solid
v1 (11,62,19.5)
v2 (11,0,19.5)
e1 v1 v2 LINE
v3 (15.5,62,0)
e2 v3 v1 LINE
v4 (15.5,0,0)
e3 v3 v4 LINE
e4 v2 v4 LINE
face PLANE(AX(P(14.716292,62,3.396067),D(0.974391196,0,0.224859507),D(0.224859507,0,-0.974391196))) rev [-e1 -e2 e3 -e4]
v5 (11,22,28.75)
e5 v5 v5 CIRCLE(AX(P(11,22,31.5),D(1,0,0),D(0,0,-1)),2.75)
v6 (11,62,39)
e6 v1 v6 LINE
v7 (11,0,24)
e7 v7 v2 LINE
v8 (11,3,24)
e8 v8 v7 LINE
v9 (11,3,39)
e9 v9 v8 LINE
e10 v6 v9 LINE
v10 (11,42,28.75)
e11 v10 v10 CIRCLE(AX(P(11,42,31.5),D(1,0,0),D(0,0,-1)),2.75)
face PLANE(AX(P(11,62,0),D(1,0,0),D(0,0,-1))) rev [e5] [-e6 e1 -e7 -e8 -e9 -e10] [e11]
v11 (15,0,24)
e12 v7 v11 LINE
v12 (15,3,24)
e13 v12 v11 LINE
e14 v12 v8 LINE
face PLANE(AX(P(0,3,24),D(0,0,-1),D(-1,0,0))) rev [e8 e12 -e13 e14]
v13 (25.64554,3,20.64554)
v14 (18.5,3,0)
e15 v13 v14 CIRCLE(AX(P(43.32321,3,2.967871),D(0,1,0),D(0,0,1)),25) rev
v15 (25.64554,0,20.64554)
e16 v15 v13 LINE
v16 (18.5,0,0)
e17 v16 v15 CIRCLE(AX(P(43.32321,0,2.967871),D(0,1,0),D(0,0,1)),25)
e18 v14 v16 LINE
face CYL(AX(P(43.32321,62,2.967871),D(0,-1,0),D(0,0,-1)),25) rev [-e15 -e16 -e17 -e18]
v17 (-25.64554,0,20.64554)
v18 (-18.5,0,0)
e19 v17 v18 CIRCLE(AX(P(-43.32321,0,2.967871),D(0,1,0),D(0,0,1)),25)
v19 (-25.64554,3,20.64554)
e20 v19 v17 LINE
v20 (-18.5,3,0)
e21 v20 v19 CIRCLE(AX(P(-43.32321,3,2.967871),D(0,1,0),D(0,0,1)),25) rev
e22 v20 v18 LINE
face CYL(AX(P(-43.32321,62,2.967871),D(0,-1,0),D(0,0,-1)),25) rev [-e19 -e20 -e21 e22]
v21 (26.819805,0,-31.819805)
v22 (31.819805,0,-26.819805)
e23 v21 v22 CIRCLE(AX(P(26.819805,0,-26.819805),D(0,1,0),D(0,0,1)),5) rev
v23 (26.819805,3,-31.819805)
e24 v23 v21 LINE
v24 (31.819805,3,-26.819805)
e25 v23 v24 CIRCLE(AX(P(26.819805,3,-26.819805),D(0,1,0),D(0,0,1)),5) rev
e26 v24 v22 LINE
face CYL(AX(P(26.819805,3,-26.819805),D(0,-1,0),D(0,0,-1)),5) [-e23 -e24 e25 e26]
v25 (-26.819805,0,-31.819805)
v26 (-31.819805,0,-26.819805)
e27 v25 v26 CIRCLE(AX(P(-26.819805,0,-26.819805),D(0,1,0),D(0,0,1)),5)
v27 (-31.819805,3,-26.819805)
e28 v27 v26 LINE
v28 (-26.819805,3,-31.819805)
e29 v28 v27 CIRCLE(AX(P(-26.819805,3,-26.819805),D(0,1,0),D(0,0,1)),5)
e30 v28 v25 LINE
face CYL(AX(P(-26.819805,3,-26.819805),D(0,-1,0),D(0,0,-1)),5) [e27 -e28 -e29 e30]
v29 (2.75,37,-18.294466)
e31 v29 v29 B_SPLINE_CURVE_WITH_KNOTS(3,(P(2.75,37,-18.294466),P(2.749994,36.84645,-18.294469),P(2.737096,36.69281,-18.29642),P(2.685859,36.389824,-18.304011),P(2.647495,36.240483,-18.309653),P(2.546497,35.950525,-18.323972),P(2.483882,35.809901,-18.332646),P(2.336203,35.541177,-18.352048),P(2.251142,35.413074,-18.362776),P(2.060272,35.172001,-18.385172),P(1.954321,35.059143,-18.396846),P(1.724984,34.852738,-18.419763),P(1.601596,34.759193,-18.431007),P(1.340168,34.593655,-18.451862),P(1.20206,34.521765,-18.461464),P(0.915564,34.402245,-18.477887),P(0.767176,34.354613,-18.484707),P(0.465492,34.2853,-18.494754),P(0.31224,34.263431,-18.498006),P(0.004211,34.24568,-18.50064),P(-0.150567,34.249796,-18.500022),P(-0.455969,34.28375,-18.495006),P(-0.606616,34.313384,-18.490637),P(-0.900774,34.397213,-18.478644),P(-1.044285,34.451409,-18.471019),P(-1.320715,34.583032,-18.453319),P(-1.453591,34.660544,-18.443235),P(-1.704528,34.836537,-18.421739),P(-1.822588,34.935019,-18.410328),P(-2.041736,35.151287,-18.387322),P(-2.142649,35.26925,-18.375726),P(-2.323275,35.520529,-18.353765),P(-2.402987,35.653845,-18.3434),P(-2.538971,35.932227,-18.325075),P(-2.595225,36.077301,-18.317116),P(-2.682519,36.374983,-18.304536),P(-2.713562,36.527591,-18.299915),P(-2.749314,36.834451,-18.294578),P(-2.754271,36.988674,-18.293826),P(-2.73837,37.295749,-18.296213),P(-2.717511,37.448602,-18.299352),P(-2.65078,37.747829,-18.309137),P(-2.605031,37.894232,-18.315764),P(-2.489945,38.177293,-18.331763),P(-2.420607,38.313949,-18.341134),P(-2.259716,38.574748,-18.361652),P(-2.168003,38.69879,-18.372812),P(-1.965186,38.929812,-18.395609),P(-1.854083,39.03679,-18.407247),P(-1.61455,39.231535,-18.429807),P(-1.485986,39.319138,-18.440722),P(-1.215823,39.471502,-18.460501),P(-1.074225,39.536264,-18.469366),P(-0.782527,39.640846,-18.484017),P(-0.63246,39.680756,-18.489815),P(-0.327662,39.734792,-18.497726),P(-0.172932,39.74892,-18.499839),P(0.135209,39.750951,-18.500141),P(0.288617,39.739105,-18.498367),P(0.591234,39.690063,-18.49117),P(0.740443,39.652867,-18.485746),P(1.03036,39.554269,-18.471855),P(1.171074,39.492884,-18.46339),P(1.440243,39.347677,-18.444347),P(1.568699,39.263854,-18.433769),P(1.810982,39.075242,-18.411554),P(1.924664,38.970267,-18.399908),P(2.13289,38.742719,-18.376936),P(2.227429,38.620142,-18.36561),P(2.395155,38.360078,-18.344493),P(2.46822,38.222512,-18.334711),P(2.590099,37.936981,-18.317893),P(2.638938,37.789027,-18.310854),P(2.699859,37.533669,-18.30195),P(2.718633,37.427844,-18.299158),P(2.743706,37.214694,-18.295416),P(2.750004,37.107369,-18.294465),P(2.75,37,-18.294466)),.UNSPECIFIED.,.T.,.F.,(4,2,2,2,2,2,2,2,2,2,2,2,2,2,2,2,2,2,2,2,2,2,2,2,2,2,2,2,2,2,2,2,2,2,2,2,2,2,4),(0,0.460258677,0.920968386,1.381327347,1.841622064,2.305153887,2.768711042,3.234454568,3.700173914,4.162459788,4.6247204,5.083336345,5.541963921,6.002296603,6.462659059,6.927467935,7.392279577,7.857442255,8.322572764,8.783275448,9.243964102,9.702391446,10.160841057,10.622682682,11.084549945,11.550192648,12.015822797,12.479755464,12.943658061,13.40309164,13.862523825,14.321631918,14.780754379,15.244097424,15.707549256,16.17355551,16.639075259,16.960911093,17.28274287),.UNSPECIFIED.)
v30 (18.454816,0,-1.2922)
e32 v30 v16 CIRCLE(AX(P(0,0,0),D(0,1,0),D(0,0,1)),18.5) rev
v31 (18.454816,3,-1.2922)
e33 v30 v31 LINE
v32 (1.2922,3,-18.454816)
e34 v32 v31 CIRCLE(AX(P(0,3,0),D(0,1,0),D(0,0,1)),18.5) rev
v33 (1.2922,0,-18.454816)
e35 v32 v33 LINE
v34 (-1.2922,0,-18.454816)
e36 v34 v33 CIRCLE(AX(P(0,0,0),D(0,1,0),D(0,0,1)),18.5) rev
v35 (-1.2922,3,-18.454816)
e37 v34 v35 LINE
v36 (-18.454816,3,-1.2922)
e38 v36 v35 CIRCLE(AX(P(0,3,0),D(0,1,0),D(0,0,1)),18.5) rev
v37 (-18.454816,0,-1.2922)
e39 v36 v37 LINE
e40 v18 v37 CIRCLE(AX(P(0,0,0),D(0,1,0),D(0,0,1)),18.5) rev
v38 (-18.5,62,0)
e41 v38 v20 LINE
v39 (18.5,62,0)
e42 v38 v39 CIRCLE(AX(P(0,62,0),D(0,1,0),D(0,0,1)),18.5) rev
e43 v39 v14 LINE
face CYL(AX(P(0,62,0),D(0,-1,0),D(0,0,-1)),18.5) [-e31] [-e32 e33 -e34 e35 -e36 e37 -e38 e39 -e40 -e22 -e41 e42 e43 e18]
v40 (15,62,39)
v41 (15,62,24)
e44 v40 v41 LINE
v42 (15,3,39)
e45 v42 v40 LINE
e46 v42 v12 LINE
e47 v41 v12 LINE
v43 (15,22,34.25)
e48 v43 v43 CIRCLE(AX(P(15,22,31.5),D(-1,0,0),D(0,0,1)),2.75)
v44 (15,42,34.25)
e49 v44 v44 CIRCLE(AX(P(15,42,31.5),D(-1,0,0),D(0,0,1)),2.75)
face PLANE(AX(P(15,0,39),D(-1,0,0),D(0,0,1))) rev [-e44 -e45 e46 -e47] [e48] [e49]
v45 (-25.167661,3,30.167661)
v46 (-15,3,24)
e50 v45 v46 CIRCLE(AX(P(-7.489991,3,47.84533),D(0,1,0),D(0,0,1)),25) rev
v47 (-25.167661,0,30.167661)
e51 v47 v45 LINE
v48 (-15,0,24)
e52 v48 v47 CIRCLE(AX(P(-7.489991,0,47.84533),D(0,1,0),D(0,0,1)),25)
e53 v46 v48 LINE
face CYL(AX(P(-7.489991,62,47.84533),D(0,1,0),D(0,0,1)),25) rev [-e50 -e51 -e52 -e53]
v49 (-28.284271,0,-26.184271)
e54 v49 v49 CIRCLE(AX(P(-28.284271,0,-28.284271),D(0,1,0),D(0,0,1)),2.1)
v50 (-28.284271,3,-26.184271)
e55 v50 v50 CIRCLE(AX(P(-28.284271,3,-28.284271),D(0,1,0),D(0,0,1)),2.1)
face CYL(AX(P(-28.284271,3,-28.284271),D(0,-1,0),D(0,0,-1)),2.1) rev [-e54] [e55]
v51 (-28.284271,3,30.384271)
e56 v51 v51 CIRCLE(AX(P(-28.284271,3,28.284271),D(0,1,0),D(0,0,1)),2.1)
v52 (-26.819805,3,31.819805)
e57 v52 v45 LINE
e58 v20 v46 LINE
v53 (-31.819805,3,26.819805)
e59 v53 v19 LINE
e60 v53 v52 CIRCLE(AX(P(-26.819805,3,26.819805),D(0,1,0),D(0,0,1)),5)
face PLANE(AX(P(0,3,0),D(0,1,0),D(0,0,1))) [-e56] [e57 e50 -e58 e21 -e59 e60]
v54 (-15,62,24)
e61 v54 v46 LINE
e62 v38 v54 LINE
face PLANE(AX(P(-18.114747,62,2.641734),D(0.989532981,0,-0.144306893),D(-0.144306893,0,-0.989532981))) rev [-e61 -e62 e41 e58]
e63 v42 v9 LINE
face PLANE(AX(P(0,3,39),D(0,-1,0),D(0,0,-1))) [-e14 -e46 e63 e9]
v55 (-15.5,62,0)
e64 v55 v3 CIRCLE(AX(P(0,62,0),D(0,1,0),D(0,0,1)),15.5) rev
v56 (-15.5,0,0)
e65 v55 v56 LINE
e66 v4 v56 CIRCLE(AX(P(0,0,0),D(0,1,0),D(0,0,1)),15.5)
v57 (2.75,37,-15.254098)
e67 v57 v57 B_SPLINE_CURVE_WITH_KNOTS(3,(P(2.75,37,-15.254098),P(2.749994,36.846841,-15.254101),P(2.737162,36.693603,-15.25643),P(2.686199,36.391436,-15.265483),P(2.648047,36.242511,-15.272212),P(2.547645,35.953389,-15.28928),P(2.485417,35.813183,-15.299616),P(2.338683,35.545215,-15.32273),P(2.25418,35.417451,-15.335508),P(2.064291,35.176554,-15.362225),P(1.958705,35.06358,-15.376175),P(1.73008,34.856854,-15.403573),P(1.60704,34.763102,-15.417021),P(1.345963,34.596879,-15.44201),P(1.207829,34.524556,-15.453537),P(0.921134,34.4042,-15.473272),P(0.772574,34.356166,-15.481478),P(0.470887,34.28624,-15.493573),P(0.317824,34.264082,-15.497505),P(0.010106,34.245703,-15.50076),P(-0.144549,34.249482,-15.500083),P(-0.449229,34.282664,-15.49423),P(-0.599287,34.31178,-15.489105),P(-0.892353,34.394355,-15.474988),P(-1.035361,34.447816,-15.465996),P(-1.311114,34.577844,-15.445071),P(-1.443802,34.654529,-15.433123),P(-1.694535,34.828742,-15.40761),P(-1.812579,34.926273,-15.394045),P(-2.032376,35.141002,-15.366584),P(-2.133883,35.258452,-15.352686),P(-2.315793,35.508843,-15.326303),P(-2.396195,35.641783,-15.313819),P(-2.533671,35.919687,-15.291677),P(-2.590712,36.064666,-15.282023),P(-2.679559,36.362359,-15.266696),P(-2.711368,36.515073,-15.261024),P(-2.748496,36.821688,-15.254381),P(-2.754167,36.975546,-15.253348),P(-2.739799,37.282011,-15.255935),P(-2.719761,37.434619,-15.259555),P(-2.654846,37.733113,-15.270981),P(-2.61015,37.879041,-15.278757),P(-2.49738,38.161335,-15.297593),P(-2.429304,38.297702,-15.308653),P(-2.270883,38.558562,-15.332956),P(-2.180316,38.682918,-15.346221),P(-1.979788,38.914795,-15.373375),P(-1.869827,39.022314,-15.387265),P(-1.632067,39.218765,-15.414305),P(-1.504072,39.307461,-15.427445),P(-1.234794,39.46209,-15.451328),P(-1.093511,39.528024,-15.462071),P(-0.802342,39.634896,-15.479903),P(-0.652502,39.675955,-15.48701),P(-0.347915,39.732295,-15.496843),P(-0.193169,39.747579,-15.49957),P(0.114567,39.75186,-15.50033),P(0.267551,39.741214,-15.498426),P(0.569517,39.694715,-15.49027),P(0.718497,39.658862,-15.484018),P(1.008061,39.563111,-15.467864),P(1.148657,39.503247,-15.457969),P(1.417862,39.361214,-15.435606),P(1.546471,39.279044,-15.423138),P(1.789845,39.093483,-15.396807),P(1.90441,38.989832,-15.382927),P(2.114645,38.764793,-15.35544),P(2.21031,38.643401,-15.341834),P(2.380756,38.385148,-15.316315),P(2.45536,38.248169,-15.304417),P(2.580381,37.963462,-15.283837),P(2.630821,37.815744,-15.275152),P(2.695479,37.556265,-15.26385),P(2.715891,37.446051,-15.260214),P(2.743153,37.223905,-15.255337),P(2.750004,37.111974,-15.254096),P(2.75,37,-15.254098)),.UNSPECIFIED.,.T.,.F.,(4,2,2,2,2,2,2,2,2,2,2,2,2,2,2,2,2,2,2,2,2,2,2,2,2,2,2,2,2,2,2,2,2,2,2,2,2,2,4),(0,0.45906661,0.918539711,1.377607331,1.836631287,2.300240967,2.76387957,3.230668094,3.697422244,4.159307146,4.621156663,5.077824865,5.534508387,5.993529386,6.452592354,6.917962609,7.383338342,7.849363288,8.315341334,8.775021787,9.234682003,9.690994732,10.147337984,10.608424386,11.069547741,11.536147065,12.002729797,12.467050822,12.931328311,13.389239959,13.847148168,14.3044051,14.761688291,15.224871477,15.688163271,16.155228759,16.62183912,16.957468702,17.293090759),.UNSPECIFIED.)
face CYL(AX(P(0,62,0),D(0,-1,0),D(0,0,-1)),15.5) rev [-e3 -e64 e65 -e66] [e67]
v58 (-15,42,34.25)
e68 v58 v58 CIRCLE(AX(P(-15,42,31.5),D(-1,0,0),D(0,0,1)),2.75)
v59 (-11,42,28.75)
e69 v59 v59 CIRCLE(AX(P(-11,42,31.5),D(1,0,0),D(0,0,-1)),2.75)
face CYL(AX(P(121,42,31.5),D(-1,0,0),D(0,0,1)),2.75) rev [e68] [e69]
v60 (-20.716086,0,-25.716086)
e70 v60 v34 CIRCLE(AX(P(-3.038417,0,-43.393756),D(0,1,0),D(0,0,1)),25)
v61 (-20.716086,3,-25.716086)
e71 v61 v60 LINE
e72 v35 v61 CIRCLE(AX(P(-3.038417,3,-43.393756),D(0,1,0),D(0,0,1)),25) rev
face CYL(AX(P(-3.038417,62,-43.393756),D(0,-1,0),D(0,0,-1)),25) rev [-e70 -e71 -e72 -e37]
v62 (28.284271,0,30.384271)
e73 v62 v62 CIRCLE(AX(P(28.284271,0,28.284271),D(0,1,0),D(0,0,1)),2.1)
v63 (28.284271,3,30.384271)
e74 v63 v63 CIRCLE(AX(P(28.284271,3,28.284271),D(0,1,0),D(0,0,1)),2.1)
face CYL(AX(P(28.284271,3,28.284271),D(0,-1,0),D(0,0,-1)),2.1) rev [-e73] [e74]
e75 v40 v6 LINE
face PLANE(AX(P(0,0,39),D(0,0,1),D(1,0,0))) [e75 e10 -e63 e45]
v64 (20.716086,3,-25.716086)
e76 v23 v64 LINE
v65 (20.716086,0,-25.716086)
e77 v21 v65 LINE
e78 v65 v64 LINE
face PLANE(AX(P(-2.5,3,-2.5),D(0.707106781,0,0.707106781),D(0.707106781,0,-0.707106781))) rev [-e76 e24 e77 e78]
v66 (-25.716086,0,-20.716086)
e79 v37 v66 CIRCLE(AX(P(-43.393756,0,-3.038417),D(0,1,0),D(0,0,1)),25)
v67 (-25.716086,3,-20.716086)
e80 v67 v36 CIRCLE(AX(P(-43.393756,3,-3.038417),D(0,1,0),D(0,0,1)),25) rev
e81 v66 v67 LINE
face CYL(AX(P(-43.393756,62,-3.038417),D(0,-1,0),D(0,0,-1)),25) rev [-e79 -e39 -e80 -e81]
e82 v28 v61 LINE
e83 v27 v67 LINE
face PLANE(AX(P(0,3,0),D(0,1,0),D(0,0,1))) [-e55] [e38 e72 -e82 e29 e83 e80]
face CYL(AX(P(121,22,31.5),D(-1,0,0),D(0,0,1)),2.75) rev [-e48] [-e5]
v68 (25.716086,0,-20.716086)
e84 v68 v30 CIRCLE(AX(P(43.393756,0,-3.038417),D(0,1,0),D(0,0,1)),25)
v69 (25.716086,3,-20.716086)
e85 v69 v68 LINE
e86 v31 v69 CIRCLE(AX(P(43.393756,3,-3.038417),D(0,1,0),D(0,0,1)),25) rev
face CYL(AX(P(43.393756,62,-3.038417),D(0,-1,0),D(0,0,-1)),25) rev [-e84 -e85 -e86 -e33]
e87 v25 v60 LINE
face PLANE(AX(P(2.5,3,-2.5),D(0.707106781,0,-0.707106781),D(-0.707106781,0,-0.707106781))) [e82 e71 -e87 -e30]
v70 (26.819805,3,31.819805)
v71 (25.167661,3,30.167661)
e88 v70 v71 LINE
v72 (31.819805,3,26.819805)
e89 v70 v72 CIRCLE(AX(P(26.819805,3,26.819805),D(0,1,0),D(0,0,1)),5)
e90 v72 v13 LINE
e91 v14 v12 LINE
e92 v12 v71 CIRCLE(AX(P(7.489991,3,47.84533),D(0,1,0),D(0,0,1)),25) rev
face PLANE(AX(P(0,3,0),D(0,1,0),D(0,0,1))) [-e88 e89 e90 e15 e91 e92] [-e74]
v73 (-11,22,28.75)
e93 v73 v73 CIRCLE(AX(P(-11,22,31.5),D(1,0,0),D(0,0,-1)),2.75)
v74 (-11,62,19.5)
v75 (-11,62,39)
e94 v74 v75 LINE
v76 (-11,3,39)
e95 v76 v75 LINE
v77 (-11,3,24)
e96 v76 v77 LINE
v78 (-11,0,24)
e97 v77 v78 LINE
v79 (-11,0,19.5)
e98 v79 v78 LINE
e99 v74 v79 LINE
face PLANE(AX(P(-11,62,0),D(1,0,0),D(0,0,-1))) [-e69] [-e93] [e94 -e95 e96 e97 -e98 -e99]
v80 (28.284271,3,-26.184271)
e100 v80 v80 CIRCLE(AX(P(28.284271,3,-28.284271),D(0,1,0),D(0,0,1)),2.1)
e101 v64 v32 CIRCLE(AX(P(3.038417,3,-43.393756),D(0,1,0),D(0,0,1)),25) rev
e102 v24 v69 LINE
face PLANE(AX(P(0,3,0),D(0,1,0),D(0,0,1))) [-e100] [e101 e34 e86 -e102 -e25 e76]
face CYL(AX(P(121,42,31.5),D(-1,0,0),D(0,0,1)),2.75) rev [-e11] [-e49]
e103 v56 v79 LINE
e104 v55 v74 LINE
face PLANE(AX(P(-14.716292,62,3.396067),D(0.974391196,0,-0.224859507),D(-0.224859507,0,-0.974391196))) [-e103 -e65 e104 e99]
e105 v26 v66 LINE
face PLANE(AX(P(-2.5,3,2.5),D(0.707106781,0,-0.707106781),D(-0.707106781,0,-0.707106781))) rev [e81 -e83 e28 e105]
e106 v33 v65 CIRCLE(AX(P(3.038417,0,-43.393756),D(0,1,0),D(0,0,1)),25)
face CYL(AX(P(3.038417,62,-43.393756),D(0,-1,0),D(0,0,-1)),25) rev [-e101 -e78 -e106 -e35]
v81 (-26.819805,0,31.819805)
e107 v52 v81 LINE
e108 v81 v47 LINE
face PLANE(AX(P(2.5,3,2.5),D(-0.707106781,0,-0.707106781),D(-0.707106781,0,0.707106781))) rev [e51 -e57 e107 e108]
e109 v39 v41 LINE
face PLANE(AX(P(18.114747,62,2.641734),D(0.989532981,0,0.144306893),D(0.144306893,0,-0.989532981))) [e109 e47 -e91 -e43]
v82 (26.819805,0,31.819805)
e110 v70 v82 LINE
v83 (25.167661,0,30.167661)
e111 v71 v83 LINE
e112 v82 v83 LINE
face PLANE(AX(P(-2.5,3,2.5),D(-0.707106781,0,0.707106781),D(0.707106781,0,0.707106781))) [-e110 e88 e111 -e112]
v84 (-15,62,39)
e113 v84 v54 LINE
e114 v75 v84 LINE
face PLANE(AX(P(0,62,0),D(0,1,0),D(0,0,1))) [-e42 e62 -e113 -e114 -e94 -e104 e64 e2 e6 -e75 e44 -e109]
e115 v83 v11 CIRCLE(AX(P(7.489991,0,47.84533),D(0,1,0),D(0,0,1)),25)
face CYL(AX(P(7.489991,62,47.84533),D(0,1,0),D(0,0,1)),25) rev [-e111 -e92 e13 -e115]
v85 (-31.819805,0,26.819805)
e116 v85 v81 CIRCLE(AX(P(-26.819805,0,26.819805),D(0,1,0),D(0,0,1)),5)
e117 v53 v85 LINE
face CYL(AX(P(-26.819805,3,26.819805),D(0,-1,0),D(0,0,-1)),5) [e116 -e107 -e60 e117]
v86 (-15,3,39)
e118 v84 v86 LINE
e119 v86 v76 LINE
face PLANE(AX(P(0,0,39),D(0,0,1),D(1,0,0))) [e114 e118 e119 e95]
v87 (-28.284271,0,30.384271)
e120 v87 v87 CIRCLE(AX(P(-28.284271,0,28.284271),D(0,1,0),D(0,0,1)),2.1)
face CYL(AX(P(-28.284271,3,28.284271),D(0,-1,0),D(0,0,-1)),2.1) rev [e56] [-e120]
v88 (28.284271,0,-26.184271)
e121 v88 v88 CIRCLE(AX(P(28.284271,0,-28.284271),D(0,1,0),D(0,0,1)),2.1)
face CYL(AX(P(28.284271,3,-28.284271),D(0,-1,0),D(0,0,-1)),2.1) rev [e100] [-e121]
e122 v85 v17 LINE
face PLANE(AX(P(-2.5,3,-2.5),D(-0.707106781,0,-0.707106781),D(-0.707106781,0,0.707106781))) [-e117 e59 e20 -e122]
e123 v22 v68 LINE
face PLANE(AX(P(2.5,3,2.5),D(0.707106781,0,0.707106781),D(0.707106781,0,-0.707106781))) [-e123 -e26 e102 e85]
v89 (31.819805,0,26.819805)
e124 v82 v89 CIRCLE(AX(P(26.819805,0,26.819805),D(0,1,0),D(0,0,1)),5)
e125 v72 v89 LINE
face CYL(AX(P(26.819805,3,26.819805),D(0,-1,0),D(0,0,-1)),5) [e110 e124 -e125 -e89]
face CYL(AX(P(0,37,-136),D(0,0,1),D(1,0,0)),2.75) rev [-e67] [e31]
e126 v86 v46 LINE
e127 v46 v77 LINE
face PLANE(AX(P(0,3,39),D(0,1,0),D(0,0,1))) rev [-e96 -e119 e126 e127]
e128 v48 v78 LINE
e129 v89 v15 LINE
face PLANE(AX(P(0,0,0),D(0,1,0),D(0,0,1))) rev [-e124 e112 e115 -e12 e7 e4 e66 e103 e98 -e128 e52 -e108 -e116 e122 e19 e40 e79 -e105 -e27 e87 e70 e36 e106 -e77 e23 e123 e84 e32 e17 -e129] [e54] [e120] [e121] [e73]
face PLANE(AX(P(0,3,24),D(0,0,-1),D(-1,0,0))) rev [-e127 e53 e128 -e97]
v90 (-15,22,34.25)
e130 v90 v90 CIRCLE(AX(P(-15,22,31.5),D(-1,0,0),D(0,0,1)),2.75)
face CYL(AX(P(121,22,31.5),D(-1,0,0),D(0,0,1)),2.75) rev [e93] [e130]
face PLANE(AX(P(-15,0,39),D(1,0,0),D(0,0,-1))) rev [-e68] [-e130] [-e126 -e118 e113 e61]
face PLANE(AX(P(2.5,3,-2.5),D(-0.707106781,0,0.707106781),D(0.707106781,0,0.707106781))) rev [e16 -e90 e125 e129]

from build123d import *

# Parameters (mm, degrees)
SKETCH_1_R          = 2.1
EXTRUDE_1_DEPTH     = 3
EXTRUDE_2_DEPTH     = 59
CUT_EXTRUDE_START   = -59
CUT_EXTRUDE_1_DEPTH = 59
CUT_EXTRUDE_2_DEPTH = 59
FILLET_3_DEPTH      = 3
SKETCH_7_W          = 4
SKETCH_7_H          = 59
EXTRUDE_3_DEPTH     = 15
SKETCH_8_R          = 2.75
CUT_EXTRUDE_3_DEPTH = 136
SKETCH_9_R          = 2.75
CUT_EXTRUDE_4_DEPTH = 136


with BuildPart() as part:
    # 草图1 → 凸台-拉伸1 (new body)
    with BuildSketch(Plane(origin=(0, 0, 0), x_dir=(1, 0, 0), z_dir=(0, 1, 0))):
        with BuildLine():
            ThreePointArc((-26.819805153, 31.819805153), (-30.355339059, 30.355339059), (-31.819805153, 26.819805153))
            Line((-31.819805153, 26.819805153), (-24, 19))
            Line((-24, 19), (-24, -19))
            Line((-24, -19), (-31.819805153, -26.819805153))
            ThreePointArc((-31.819805153, -26.819805153), (-30.355339059, -30.355339059), (-26.819805153, -31.819805153))
            Line((-26.819805153, -31.819805153), (-19, -24))
            Line((-19, -24), (19, -24))
            Line((19, -24), (26.819805153, -31.819805153))
            ThreePointArc((26.819805153, -31.819805153), (30.355339059, -30.355339059), (31.819805153, -26.819805153))
            Line((31.819805153, -26.819805153), (24, -19))
            Line((24, -19), (24, 19))
            Line((24, 19), (31.819805153, 26.819805153))
            ThreePointArc((31.819805153, 26.819805153), (30.355339059, 30.355339059), (26.819805153, 31.819805153))
            Line((26.819805153, 31.819805153), (19, 24))
            Line((19, 24), (-19, 24))
            Line((-19, 24), (-26.819805153, 31.819805153))
        make_face()
        with Locations(Location((-28.284271247, 28.284271247, 0), (0, 0, 270))):
            Circle(SKETCH_1_R, mode=Mode.SUBTRACT)
        with Locations(Location((-28.284271247, -28.284271247, 0), (0, 0, 270))):
            Circle(SKETCH_1_R, mode=Mode.SUBTRACT)
        with Locations(Location((28.284271247, 28.284271247, 0), (0, 0, 270))):
            Circle(SKETCH_1_R, mode=Mode.SUBTRACT)
        with Locations(Location((28.284271247, -28.284271247, 0), (0, 0, 270))):
            Circle(SKETCH_1_R, mode=Mode.SUBTRACT)
    extrude(amount=EXTRUDE_1_DEPTH)

    # 草图2 → 凸台-拉伸2 (add)
    with BuildSketch(Plane(origin=(0, 3, 0), x_dir=(1, 0, 0), z_dir=(0, 1, 0))):
        with BuildLine():
            Line((-11, -24), (-11, -19.5))
            Line((-11, -19.5), (-15.5, 0))
            ThreePointArc((-15.5, 0), (0, 15.5), (15.5, 0))
            Line((15.5, 0), (11, -19.5))
            Line((11, -19.5), (11, -24))
            Line((11, -24), (15, -24))
            Line((15, -24), (18.5, 0))
            ThreePointArc((18.5, 0), (0, 18.5), (-18.5, 0))
            Line((-18.5, 0), (-15, -24))
            Line((-15, -24), (-11, -24))
        make_face()
    extrude(amount=EXTRUDE_2_DEPTH)

    # 草图5 → 切除-拉伸1 (cut)
    with BuildSketch(Plane(origin=(0, 3, 0), x_dir=(1, 0, 0), z_dir=(0, 1, 0)).offset(CUT_EXTRUDE_START)):
        with BuildLine():
            Line((-15.5, 0), (-11, -19.5))
            Line((-11, -19.5), (-11, -24))
            Line((-11, -24), (11, -24))
            Line((11, -24), (11, -19.5))
            Line((11, -19.5), (15.5, 0))
            ThreePointArc((15.5, 0), (0, 15.5), (-15.5, 0))
        make_face()
    extrude(amount=CUT_EXTRUDE_1_DEPTH, mode=Mode.SUBTRACT)

    # 草图6 → 切除-拉伸2 (cut)
    with BuildSketch(Plane(origin=(0, 3, 0), x_dir=(1, 0, 0), z_dir=(0, 1, 0)).offset(CUT_EXTRUDE_START)):
        with BuildLine():
            Line((-15.340366038, 10.340366038), (-24, 19))
            Line((-24, 19), (-24, -19))
            Line((-24, -19), (-16.781818182, -11.781818182))
            Line((-16.781818182, -11.781818182), (-18.5, 0))
            ThreePointArc((-18.5, 0), (-17.692466924, 5.406164458), (-15.340366038, 10.340366038))
        make_face()
        with BuildLine():
            Line((-19, 24), (-10.629360281, 15.141555403))
            ThreePointArc((-10.629360281, 15.141555403), (-0.040504877, 18.499955658), (10.562955089, 15.187955089))
            Line((10.562955089, 15.187955089), (19, 24))
            Line((19, 24), (-19, 24))
        make_face()
        Polygon((-15, -24), (-15.509090909, -20.509090909), (-19, -24), align=None)
        with BuildLine():
            Line((24, 19), (15.141555403, 10.629360281))
            ThreePointArc((15.141555403, 10.629360281), (17.640419141, 5.573653427), (18.5, 0))
            Line((18.5, 0), (16.702005947, -12.329102079))
            Line((16.702005947, -12.329102079), (24, -19))
            Line((24, -19), (24, 19))
        make_face()
        Polygon((19, -24), (15.486287413, -20.665457737), (15, -24), align=None)
    extrude(amount=CUT_EXTRUDE_2_DEPTH, mode=Mode.SUBTRACT)

    # 圆角3: read off the stored shape, not the designer's step
    # 圆角3 outline → 圆角3 (add)
    with BuildSketch(Plane(origin=(0, 0, 0), x_dir=(1, 0, 0), z_dir=(0, 1, 0))):
        with BuildLine():
            Line((-16.781818182, -11.781818182), (-18.5, 0))
            ThreePointArc((-18.5, 0), (-19.698206739, -11.144620168), (-25.645540243, -20.645540243))
            Line((-25.645540243, -20.645540243), (-16.781818182, -11.781818182))
        make_face()
        with BuildLine():
            Line((19, -24), (15.486287413, -20.665457737))
            Line((15.486287413, -20.665457737), (15, -24))
            ThreePointArc((15, -24), (20.455899997, -26.47045686), (25.167660505, -30.167660505))
            Line((25.167660505, -30.167660505), (19, -24))
        make_face()
        with BuildLine():
            ThreePointArc((25.645540243, -20.645540243), (19.698206739, -11.144620168), (18.5, 0))
            Line((18.5, 0), (16.702005947, -12.329102079))
            Line((16.702005947, -12.329102079), (24, -19))
            Line((24, -19), (25.645540243, -20.645540243))
        make_face()
        with BuildLine():
            Line((24, 19), (15.141555403, 10.629360281))
            ThreePointArc((15.141555403, 10.629360281), (17.434869544, 6.186705422), (18.454815599, 1.292200137))
            ThreePointArc((18.454815599, 1.292200137), (19.976546369, 11.792519114), (25.716086069, 20.716086069))
            Line((25.716086069, 20.716086069), (24, 19))
        make_face()
        with BuildLine():
            ThreePointArc((20.716086069, 25.716086069), (11.792519114, 19.976546369), (1.292200137, 18.454815599))
            ThreePointArc((1.292200137, 18.454815599), (6.148517769, 17.448373255), (10.562955089, 15.187955089))
            Line((10.562955089, 15.187955089), (19, 24))
            Line((19, 24), (20.716086069, 25.716086069))
        make_face()
        with BuildLine():
            Line((-19, 24), (-10.629360281, 15.141555403))
            ThreePointArc((-10.629360281, 15.141555403), (-6.186705422, 17.434869544), (-1.292200137, 18.454815599))
            ThreePointArc((-1.292200137, 18.454815599), (-11.792519114, 19.976546369), (-20.716086069, 25.716086069))
            Line((-20.716086069, 25.716086069), (-19, 24))
        make_face()
        with BuildLine():
            ThreePointArc((-25.716086069, 20.716086069), (-19.976546369, 11.792519114), (-18.454815599, 1.292200137))
            ThreePointArc((-18.454815599, 1.292200137), (-17.492738551, 6.021137598), (-15.340366038, 10.340366038))
            Line((-15.340366038, 10.340366038), (-25.716086069, 20.716086069))
        make_face()
        with BuildLine():
            Line((-15, -24), (-15.509090909, -20.509090909))
            Line((-15.509090909, -20.509090909), (-25.167660505, -30.167660505))
            ThreePointArc((-25.167660505, -30.167660505), (-20.455899997, -26.47045686), (-15, -24))
        make_face()
    extrude(amount=FILLET_3_DEPTH)

    # 草图7 → 凸台-拉伸3 (add)
    with BuildSketch(Plane.XY.offset(24)):
        with Locations((-13, 32.5)):
            Rectangle(SKETCH_7_W, SKETCH_7_H)
        with Locations((13, 32.5)):
            Rectangle(SKETCH_7_W, SKETCH_7_H)
    extrude(amount=EXTRUDE_3_DEPTH)

    # 草图8 → 切除-拉伸3 (cut)
    with BuildSketch(Plane.XY):
        with Locations((0, 37)):
            Circle(SKETCH_8_R)
    extrude(amount=-CUT_EXTRUDE_3_DEPTH, mode=Mode.SUBTRACT)

    # 草图9 → 切除-拉伸4 (cut)
    with BuildSketch(Plane.ZY.offset(15)):
        with Locations((31.5, 42)):
            Circle(SKETCH_9_R)
        with Locations((31.5, 22)):
            Circle(SKETCH_9_R)
    extrude(amount=-CUT_EXTRUDE_4_DEPTH, mode=Mode.SUBTRACT)


solid = part.part
